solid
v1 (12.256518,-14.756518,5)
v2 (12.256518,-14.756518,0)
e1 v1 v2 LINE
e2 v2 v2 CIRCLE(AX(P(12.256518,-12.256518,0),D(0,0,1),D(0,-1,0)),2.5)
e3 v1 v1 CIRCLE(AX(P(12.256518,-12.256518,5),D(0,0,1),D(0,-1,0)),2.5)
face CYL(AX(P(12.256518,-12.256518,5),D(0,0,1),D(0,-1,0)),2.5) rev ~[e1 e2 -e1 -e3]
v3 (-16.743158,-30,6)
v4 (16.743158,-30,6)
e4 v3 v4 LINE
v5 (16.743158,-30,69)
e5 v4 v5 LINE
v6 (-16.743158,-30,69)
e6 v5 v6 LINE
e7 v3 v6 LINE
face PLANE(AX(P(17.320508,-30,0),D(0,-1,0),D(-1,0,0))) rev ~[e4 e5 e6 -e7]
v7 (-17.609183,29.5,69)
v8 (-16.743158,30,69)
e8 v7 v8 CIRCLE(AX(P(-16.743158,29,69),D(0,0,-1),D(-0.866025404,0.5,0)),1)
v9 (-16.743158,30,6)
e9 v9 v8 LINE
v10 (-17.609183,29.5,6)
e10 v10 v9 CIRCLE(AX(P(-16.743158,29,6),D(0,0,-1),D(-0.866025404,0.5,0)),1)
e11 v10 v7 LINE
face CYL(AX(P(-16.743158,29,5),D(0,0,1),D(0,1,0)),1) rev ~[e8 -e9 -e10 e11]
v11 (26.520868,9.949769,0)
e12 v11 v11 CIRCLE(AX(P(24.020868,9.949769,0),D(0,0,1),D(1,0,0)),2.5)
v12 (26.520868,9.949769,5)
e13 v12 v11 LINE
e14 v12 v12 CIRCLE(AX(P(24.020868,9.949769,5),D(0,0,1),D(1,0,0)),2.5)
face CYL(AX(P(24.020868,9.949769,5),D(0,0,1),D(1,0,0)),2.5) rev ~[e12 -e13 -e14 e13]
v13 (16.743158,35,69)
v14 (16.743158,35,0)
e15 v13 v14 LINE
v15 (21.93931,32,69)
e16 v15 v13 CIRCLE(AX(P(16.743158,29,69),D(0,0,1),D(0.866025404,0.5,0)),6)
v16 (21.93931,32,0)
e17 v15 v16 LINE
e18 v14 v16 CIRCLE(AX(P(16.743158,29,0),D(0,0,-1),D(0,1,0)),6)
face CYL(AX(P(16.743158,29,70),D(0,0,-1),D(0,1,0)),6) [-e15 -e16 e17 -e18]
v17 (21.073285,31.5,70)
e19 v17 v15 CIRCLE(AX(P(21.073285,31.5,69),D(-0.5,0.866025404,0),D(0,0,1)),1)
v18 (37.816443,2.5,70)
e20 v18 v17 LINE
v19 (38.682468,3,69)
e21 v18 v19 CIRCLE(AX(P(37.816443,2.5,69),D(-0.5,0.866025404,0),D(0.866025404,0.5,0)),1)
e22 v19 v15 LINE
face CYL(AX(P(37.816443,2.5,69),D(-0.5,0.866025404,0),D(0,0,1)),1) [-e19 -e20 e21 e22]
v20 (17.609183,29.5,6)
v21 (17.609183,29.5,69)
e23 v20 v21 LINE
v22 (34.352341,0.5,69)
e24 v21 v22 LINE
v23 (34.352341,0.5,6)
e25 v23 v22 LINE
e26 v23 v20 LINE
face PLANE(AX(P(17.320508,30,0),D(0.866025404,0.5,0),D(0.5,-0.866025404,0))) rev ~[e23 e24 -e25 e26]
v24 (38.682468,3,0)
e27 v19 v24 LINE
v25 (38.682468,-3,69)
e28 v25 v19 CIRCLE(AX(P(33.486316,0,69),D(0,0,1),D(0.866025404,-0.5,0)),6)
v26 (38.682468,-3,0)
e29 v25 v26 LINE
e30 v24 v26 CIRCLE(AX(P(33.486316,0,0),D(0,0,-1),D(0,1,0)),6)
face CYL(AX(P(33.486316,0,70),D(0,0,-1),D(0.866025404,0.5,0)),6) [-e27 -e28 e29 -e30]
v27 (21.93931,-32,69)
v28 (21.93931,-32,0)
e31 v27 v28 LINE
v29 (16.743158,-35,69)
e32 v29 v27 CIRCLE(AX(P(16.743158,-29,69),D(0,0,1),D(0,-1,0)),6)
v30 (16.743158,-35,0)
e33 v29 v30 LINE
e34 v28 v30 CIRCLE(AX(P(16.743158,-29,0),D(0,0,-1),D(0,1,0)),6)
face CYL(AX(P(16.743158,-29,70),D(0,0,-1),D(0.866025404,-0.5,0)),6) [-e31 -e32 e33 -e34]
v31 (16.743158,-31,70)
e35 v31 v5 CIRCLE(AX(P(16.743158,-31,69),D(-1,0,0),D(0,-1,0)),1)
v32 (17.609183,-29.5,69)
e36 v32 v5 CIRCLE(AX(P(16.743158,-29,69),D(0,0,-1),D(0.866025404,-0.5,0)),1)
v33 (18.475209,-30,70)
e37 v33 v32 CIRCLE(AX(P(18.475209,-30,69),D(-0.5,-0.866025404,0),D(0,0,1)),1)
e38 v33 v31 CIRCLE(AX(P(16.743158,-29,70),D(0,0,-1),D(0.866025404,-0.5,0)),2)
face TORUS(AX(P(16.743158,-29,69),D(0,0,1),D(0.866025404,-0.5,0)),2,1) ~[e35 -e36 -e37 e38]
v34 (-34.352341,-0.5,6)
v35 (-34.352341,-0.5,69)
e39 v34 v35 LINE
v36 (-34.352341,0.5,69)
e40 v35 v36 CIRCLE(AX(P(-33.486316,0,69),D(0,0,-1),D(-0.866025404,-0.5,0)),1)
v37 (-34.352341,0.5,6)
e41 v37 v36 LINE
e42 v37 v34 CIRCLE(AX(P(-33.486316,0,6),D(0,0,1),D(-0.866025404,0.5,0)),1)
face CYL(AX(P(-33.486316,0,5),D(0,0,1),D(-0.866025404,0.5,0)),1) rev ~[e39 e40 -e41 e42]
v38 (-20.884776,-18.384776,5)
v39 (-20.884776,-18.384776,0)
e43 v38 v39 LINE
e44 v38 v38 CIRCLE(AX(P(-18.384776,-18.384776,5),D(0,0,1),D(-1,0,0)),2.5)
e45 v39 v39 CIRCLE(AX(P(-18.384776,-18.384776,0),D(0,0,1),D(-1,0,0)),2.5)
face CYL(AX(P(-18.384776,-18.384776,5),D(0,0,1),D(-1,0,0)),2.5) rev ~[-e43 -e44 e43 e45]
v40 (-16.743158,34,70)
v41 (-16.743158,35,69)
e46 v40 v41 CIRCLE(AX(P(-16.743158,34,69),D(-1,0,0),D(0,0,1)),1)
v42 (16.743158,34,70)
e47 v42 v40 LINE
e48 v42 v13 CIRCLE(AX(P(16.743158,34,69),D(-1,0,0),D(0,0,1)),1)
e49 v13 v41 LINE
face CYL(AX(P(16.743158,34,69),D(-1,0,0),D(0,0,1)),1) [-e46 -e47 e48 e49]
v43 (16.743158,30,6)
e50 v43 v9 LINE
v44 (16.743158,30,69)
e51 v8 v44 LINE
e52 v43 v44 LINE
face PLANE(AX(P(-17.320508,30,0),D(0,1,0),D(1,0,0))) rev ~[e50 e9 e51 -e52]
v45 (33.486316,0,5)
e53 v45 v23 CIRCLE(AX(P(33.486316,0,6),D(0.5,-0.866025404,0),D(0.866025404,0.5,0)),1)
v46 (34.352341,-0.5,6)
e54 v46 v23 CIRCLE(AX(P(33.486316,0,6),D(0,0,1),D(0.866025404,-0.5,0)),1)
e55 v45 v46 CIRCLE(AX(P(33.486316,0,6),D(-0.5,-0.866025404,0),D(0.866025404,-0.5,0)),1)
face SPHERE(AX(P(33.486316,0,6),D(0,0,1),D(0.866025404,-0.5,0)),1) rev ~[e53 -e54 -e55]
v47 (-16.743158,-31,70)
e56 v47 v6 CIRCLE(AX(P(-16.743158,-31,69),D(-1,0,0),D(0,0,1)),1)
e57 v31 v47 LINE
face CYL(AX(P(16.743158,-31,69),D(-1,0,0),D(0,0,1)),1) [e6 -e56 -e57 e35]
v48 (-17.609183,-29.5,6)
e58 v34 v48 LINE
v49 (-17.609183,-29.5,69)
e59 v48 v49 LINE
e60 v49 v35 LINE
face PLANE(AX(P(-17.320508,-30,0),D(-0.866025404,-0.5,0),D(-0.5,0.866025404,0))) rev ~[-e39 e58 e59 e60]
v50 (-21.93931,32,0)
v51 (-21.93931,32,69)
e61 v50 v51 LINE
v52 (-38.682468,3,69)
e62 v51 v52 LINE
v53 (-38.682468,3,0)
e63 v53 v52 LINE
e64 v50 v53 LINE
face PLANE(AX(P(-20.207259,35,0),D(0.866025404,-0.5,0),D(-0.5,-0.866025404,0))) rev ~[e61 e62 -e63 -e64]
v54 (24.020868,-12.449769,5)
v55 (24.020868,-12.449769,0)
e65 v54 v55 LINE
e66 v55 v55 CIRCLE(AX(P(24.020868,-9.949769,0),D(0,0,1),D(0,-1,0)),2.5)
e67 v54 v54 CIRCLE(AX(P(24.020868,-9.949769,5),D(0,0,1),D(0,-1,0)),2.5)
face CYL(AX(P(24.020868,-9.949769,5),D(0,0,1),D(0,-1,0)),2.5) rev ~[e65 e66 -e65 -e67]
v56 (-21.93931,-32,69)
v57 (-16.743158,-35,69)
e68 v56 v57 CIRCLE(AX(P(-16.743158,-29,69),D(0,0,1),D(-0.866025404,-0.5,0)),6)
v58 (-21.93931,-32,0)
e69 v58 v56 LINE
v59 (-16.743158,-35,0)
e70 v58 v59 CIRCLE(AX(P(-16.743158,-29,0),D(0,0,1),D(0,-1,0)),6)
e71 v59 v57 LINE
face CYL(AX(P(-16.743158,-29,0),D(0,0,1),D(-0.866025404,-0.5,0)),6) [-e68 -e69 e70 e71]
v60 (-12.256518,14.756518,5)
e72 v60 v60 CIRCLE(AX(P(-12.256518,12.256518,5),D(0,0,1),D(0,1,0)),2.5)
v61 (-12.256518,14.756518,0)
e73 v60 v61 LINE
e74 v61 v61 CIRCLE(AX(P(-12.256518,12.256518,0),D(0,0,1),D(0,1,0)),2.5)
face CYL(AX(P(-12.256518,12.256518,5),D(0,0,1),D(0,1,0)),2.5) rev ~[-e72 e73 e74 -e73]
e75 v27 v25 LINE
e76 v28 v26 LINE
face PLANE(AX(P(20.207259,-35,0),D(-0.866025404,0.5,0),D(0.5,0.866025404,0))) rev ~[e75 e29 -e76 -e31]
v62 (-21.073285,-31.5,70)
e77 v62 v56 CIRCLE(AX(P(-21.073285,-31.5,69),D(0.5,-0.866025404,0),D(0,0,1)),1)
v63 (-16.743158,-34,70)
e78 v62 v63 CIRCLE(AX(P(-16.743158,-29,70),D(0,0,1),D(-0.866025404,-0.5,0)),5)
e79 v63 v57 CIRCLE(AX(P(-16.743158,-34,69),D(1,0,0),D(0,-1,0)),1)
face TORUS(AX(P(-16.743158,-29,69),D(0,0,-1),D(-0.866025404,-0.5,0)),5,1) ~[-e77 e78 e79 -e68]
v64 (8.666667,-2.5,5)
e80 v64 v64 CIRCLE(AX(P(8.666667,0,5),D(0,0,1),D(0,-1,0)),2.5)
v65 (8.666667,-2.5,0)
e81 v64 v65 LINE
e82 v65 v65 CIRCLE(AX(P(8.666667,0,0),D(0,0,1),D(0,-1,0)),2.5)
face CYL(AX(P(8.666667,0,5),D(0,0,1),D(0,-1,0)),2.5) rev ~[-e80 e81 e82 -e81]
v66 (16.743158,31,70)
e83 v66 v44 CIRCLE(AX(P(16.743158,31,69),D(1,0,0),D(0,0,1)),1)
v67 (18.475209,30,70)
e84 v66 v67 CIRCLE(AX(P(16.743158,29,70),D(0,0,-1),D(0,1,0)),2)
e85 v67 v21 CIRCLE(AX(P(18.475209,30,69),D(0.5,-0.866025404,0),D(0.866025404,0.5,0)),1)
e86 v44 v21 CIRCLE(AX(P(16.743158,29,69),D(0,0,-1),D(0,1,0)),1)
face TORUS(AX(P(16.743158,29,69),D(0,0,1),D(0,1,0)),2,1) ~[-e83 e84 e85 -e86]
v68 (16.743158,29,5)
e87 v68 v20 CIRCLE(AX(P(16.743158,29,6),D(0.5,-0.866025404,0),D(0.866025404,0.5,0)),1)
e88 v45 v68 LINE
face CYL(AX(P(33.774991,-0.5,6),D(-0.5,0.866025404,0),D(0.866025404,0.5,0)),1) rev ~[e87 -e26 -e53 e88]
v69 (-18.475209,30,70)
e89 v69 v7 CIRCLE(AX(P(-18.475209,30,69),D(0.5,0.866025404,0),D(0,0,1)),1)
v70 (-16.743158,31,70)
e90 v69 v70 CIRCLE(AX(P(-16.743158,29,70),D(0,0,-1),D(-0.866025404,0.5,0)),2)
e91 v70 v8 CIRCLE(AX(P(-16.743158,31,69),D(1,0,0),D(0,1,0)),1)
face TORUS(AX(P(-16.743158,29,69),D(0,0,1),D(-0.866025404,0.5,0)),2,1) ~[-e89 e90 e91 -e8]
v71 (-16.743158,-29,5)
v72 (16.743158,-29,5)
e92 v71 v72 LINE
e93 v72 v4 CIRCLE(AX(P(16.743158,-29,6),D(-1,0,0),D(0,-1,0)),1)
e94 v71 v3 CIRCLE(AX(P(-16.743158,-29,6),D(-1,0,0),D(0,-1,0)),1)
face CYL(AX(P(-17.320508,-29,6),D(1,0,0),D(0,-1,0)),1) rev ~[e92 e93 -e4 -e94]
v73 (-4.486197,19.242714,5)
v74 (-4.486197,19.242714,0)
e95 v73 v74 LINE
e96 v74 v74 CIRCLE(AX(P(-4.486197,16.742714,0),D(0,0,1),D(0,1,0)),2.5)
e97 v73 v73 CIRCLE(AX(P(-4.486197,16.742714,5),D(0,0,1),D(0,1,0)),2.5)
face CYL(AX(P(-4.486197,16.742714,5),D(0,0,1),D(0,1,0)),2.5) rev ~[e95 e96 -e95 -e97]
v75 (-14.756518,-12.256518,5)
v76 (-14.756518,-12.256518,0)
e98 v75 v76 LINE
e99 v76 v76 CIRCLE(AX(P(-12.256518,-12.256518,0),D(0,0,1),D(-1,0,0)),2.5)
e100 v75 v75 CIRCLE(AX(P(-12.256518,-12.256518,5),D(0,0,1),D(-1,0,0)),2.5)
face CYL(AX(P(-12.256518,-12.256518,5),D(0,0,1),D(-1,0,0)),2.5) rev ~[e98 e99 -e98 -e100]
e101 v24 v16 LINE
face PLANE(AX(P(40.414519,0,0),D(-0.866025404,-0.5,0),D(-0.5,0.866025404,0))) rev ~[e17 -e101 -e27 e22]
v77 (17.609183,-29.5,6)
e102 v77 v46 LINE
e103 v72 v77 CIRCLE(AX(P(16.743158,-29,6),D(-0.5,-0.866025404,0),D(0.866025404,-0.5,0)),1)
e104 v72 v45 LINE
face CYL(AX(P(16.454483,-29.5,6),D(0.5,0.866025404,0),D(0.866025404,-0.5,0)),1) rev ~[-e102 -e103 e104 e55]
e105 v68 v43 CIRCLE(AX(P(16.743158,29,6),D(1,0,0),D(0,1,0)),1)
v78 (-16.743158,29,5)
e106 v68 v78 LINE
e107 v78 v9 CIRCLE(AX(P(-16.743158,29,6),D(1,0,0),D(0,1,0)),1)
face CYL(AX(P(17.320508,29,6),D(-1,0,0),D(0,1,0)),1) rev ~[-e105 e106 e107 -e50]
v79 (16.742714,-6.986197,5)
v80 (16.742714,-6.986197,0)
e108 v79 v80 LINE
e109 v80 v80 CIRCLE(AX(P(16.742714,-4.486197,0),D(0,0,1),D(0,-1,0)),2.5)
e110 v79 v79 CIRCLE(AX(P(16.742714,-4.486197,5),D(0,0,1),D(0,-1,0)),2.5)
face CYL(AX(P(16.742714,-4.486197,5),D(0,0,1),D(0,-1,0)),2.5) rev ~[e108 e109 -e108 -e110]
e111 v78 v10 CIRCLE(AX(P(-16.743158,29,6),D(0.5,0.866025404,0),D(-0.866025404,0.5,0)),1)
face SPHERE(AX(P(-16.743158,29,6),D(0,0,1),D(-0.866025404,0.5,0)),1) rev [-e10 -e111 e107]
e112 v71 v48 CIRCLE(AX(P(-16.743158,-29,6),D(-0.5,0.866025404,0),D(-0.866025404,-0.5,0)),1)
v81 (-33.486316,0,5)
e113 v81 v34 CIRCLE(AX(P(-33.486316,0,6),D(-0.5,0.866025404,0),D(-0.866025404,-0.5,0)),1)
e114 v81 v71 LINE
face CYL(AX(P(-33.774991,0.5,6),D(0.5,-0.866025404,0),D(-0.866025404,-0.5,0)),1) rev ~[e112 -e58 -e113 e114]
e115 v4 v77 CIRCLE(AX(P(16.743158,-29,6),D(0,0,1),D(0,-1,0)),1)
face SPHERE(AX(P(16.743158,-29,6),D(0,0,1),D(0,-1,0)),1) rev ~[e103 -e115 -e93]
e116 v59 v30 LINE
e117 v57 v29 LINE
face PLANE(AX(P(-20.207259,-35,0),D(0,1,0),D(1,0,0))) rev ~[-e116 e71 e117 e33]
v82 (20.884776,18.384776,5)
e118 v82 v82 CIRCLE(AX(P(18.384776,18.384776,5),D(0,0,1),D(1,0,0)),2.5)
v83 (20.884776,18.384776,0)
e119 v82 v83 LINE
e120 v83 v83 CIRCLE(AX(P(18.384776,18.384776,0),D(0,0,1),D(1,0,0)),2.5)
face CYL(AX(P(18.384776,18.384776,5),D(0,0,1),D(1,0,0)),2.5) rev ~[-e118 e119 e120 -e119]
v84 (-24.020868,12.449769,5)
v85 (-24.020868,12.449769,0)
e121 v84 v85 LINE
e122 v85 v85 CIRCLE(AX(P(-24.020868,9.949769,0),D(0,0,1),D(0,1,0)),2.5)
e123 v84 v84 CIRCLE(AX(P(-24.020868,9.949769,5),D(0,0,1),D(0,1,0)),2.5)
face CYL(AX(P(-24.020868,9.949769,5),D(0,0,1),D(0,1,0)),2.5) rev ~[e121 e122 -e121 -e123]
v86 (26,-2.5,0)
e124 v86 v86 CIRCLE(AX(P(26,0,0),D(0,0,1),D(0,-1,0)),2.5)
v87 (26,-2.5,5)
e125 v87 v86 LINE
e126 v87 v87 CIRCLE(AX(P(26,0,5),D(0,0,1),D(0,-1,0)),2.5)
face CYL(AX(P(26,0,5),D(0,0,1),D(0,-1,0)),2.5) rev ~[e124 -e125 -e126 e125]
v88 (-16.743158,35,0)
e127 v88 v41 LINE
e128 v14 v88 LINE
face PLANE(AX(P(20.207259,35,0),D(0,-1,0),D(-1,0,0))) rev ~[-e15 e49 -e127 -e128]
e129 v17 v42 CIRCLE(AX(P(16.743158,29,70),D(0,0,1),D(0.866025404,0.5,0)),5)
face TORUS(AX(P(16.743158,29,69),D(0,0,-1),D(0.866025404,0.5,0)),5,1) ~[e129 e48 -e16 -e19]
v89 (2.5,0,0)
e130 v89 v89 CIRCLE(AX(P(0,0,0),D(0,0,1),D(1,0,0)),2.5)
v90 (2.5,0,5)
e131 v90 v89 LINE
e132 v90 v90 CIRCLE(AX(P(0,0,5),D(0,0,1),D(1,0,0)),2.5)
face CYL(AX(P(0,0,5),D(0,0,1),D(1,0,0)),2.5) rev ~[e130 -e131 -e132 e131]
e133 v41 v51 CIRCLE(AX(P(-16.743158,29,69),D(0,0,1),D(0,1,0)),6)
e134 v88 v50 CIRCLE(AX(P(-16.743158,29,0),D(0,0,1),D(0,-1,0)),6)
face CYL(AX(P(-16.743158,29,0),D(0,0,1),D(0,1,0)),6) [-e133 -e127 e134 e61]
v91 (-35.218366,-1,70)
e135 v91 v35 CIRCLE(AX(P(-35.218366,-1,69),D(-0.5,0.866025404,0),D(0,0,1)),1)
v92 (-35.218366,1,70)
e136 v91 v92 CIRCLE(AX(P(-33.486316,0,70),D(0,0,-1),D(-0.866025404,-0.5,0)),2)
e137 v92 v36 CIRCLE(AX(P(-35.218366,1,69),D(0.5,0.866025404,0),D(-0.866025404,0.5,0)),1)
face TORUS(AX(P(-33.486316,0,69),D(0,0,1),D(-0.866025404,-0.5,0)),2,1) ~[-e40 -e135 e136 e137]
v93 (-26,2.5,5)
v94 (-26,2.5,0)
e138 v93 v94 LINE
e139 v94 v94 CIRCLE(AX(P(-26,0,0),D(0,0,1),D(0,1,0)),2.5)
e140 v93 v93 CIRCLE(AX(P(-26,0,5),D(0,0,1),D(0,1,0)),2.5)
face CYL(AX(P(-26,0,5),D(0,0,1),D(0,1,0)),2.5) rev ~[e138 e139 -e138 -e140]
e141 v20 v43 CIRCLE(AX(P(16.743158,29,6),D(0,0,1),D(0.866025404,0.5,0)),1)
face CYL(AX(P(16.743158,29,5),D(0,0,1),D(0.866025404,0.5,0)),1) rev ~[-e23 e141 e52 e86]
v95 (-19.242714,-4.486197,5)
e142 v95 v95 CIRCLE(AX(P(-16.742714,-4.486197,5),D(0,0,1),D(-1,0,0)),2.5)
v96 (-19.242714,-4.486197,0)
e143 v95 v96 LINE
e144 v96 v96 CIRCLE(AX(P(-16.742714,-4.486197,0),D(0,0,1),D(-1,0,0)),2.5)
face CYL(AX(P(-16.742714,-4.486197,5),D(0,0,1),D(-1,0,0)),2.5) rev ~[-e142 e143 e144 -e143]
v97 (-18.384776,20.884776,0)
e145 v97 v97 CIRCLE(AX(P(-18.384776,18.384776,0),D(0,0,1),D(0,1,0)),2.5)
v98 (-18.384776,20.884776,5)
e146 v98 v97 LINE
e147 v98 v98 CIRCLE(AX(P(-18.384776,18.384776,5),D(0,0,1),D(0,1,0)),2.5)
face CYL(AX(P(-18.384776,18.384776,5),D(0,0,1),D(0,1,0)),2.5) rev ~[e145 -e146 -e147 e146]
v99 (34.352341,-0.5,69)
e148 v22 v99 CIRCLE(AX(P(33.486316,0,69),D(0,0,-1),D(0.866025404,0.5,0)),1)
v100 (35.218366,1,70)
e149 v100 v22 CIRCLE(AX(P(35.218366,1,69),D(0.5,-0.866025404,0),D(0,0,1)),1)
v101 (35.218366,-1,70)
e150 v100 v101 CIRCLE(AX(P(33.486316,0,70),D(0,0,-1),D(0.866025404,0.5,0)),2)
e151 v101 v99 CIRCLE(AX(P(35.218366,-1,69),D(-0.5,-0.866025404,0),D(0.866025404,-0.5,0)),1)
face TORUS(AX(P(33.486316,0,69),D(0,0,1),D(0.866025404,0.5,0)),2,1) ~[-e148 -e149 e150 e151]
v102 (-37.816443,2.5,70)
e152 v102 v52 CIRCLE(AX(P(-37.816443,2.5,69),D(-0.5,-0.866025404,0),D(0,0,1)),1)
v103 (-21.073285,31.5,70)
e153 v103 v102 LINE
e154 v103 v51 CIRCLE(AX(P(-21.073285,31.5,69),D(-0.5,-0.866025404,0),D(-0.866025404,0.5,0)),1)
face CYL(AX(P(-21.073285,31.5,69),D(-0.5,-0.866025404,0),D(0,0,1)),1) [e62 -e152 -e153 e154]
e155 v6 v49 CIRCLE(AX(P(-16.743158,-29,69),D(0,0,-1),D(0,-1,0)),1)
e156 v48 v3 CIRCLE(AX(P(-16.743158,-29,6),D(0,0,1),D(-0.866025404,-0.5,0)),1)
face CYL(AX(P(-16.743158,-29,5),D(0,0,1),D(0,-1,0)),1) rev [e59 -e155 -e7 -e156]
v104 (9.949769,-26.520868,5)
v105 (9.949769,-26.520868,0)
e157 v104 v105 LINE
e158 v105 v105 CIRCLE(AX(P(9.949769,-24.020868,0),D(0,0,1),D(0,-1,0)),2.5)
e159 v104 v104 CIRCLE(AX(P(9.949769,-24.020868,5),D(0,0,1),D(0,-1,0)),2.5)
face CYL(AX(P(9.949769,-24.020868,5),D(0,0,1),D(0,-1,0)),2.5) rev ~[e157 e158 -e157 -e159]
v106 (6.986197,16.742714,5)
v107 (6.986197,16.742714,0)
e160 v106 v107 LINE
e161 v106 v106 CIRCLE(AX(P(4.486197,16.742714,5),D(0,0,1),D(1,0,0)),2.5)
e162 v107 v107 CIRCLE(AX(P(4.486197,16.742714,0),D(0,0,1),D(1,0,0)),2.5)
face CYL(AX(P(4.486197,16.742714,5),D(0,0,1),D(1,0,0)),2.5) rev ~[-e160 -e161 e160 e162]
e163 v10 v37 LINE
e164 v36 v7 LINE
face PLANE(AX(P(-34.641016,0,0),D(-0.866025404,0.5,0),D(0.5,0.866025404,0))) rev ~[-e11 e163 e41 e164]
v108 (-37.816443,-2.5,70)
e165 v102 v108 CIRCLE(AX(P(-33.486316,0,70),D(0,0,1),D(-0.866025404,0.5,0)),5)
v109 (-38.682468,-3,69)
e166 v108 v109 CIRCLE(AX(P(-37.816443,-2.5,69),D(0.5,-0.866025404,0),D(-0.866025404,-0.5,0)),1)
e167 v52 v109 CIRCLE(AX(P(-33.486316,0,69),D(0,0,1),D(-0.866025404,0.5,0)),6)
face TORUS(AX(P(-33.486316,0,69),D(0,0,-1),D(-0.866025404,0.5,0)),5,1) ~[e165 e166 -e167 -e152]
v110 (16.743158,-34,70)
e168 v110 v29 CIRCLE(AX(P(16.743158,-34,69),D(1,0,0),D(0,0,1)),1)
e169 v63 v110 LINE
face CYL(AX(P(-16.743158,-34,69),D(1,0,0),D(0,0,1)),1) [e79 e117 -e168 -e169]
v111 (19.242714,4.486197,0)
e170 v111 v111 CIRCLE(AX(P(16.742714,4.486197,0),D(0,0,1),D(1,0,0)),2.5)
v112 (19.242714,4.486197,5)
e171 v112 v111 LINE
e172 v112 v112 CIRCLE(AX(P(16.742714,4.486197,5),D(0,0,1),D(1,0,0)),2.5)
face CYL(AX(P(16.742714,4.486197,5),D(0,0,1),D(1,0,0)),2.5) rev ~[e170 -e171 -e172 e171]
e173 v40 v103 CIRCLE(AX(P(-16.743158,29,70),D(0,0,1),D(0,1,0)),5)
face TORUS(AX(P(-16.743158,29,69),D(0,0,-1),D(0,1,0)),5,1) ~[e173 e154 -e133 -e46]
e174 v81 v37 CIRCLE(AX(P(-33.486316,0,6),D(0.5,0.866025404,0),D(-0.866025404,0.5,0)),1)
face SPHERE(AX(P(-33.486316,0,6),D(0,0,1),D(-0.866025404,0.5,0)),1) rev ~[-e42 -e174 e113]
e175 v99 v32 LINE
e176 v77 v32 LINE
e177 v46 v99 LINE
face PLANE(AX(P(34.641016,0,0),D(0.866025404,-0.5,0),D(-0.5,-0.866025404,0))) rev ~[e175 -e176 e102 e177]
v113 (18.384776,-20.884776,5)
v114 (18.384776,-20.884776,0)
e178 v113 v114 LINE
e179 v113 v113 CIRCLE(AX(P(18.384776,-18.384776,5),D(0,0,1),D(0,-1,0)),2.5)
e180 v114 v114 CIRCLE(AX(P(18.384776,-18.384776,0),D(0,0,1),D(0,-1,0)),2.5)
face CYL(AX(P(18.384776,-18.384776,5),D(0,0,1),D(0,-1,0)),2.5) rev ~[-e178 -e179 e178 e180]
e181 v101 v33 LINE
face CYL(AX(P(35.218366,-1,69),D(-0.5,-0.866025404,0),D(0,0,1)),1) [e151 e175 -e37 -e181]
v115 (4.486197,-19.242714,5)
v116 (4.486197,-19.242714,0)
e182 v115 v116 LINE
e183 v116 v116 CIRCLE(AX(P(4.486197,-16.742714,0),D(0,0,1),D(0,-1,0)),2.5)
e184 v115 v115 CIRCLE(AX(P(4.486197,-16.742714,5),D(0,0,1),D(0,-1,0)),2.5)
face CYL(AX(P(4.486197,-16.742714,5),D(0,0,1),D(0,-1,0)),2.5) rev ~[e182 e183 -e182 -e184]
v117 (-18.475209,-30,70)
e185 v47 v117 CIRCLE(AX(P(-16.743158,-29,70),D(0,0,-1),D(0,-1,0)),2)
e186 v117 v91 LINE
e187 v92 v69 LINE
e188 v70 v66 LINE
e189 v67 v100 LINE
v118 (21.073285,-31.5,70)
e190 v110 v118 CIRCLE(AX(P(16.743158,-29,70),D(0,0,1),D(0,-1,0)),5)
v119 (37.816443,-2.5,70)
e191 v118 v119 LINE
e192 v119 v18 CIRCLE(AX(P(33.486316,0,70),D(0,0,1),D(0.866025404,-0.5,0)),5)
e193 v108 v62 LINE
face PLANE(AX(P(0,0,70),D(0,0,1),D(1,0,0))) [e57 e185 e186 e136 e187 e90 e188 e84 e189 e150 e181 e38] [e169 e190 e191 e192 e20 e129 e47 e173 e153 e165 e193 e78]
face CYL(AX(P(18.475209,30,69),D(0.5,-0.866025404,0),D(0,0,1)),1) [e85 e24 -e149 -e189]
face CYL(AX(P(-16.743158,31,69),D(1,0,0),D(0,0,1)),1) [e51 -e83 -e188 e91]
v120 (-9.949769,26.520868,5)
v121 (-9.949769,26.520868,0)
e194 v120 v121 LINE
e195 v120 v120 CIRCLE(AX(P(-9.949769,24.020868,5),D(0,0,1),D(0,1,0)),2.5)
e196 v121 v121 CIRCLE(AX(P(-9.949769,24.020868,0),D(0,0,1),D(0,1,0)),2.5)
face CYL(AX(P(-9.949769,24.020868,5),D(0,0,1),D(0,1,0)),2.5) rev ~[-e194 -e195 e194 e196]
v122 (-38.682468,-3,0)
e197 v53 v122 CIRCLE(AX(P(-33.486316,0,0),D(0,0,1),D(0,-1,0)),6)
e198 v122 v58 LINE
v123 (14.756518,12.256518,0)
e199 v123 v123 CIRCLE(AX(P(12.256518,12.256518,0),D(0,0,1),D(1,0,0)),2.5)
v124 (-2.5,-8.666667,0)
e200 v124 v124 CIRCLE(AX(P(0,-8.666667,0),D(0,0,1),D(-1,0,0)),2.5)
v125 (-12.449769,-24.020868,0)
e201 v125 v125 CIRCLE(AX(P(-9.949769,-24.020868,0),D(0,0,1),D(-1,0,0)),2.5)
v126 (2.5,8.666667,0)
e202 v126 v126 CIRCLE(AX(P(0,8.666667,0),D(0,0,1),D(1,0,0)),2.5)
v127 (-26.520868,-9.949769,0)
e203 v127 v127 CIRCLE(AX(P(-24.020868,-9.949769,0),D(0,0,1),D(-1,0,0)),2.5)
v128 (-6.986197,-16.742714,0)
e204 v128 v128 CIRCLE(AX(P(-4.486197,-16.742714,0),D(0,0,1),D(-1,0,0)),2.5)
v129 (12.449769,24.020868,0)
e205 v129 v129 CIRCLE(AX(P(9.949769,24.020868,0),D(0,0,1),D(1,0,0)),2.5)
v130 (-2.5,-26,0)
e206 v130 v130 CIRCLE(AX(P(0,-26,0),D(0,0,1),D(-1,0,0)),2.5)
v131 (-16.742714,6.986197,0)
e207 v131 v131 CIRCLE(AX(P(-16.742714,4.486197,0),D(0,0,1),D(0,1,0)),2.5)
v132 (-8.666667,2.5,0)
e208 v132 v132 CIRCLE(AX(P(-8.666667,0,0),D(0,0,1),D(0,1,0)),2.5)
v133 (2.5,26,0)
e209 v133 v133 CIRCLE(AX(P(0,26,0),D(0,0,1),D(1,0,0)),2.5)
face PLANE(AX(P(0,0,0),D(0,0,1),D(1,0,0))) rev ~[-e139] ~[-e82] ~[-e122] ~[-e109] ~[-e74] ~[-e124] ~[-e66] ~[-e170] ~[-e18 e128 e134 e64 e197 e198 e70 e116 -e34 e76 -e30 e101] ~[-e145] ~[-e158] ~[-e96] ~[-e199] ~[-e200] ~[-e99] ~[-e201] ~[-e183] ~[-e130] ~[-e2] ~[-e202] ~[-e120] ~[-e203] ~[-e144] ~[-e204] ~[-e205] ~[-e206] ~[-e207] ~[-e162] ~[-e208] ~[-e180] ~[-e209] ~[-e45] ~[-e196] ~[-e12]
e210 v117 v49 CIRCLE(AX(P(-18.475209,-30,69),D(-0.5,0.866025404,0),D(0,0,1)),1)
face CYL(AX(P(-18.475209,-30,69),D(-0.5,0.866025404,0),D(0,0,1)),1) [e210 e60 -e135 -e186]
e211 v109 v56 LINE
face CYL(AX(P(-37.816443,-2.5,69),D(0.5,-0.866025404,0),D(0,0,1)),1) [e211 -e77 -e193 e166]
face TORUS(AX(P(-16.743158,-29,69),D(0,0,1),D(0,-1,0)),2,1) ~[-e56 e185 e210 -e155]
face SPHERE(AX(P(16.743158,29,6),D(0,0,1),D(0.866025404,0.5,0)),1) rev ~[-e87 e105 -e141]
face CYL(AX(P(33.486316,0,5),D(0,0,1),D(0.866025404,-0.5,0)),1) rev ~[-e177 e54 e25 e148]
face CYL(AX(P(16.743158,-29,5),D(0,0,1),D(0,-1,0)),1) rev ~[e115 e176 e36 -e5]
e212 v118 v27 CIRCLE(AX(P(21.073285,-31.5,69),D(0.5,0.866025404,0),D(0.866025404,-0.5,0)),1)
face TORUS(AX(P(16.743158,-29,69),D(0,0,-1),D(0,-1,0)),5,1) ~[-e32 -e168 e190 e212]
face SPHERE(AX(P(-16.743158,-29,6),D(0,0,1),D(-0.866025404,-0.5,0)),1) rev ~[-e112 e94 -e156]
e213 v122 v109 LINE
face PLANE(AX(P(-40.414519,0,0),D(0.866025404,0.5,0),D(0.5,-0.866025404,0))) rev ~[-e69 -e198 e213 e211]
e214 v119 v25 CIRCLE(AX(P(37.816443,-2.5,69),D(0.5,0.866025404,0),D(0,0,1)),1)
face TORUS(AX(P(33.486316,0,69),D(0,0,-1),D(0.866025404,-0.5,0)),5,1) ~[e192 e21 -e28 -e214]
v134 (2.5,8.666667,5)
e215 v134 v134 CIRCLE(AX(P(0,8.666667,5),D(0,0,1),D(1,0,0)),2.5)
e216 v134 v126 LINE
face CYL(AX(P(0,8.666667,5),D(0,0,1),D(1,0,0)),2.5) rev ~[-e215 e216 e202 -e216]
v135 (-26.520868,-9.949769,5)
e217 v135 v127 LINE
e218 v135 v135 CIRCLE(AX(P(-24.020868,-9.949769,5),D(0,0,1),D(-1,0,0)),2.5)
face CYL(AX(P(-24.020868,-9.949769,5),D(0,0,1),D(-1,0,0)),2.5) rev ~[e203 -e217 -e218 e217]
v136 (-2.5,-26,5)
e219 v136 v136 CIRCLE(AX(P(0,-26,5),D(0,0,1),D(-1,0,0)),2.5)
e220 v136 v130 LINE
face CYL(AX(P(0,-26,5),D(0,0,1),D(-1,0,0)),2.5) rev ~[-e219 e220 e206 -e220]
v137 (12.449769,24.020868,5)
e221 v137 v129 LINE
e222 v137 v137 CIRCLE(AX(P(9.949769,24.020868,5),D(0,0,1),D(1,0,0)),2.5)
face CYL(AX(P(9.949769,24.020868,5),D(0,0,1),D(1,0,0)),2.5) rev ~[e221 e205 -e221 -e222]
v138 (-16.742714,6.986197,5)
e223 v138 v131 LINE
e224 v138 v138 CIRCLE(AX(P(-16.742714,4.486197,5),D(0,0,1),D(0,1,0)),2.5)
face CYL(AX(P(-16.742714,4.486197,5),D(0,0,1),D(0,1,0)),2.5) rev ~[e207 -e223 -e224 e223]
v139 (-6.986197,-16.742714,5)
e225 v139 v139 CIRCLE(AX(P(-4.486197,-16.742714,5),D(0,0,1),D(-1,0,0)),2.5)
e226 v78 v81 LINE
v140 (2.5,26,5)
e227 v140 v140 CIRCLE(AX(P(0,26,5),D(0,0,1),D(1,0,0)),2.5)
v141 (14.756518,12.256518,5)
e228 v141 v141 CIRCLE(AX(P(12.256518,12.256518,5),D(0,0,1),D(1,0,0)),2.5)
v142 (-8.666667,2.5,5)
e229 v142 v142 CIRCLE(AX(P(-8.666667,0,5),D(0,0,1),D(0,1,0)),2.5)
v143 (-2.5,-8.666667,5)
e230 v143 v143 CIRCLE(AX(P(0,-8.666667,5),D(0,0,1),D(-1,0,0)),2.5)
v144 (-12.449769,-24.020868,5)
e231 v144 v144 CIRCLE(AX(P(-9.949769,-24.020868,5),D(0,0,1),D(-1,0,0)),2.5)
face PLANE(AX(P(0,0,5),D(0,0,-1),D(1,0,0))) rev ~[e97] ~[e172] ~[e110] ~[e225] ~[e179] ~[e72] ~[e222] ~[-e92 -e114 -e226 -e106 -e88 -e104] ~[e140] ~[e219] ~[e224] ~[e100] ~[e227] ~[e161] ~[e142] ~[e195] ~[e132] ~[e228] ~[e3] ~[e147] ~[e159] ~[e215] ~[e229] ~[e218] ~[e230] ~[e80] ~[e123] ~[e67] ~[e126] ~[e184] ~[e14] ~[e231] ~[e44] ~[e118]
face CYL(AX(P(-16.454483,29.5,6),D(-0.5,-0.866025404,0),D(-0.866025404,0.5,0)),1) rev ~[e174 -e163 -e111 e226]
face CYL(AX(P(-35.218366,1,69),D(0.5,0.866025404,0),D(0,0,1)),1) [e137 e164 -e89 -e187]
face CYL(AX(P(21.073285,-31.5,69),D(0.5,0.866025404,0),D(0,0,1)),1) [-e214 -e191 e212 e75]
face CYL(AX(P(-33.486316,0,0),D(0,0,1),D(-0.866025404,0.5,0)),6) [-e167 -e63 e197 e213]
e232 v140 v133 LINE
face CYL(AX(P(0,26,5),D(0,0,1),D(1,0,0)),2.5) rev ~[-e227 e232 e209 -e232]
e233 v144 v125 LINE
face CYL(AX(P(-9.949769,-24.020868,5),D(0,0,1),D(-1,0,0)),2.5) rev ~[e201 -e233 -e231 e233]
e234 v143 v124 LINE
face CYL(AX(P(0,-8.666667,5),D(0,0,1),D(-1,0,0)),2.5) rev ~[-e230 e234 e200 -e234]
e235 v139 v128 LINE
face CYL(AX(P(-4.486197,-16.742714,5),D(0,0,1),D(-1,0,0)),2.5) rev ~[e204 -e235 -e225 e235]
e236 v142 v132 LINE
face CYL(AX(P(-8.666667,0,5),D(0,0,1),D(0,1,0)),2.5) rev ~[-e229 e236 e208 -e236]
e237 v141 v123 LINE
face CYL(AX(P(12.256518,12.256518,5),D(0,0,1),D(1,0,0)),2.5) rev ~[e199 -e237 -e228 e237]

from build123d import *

# Parameters (mm, degrees)
F1_DEPTH        = 70
F3_DEPTH        = 5
F4_R            = 2.5
F5_DEPTH        = 5
F5_COPIES_COUNT = 4
F7_R            = 2.5
F8_DEPTH        = 5
F9_R            = 6
F10_R           = 1
F11_R           = 1


# Not quite as in the source:
# - a pattern or mirror of a feature is missing from the dataset's text; its kind, count and spacing are read off the source's solid


with BuildPart() as f1:
    # F0 (on Top) → F1 (new body)
    with BuildSketch(Plane.XY):
        Polygon((20.2072594216, 35), (-20.2072594216, 35), (-40.4145188433, 0), (-20.2072594216, -35), (20.2072594216, -35), (40.4145188433, 0), align=None)
        Polygon((-17.3205080757, -30), (-34.6410161514, 0), (-17.3205080757, 30), (17.3205080757, 30), (34.6410161514, 0), (17.3205080757, -30), align=None, mode=Mode.SUBTRACT)
    extrude(amount=F1_DEPTH)

    # F2 (on face) → F3 (join)
    with BuildSketch(Plane(origin=(0, 0, 0), x_dir=(1, 0, 0), z_dir=(0, 0, -1))):
        Polygon((-20.2072594216, 35), (-40.4145188433, 0), (-20.2072594216, -35), (20.2072594216, -35), (40.4145188433, 0), (20.2072594216, 35), align=None)
    extrude(amount=-F3_DEPTH)

    # F4 (on face) → F5 (cut, through all)
    with BuildSketch(Plane.XY.offset(5)):
        with Locations((0, 26)):
            Circle(F4_R)
        with Locations((4.4861967818, 16.7427143223)):
            Circle(F4_R)
        with Locations((0, 8.6666666667)):
            Circle(F4_R)
        with Locations((12.2565175406, 12.2565175406)):
            Circle(F4_R)
        with Locations((9.9497692415, 24.0208678453)):
            Circle(F4_R)
        with Locations((24.0208678453, 9.9497692415)):
            Circle(F4_R)
        with Locations((16.7427143223, 4.4861967818)):
            Circle(F4_R)
        with Locations((18.3847763109, 18.3847763109)):
            Circle(F4_R)
    f5 = extrude(amount=-F5_DEPTH, mode=Mode.SUBTRACT)

    # F5_copies: F5 ×4 about axis
    f5_copies_axis = Axis((0, 0, 0), (0, 0, 1))
    for i in range(1, F5_COPIES_COUNT):
        add(f5.rotate(f5_copies_axis, i * 360 / F5_COPIES_COUNT), mode=Mode.SUBTRACT)

    # F7 (on face) → F8 (cut, through all)
    with BuildSketch(Plane.XY.offset(5)):
        Circle(F7_R)
    extrude(amount=-F8_DEPTH, mode=Mode.SUBTRACT)

    # F9
    f9_edges = [f1.edges().sort_by_distance(p)[0] for p in [
        (-20.207259, 35, 35),
        (-40.414519, 0, 35),
        (-20.207259, -35, 35),
        (20.207259, -35, 35),
        (40.414519, 0, 35),
        (20.207259, 35, 35),
    ]]
    fillet(f9_edges, radius=F9_R)

    # F10
    f10_edges = [f1.edges().sort_by_distance(p)[0] for p in [
        (-17.320508, 30, 37.5),
        (17.320508, 30, 37.5),
        (34.641016, 0, 37.5),
        (17.320508, -30, 37.5),
        (-17.320508, -30, 37.5),
        (-34.641016, 0, 37.5),
        (-25.980762, 15, 5),
        (-25.980762, -15, 5),
        (0, -30, 5),
        (25.980762, -15, 5),
        (25.980762, 15, 5),
        (0, 30, 5),
    ]]
    fillet(f10_edges, radius=F10_R)

    # F11
    f11_edges = [f1.edges().sort_by_distance(p)[0] for p in [
        (-25.980762, -15, 70),
        (-17.243158, -29.866025, 70),
        (-34.486316, 0, 70),
        (0, -30, 70),
        (-25.980762, 15, 70),
        (17.243158, -29.866025, 70),
        (-17.243158, 29.866025, 70),
        (25.980762, -15, 70),
        (0, 30, 70),
        (34.486316, 0, 70),
        (17.243158, 29.866025, 70),
        (25.980762, 15, 70),
        (0, 35, 70),
        (19.743158, 34.196152, 70),
        (-19.743158, 34.196152, 70),
        (30.310889, 17.5, 70),
        (-30.310889, 17.5, 70),
        (39.486316, 0, 70),
        (-39.486316, 0, 70),
        (30.310889, -17.5, 70),
        (-30.310889, -17.5, 70),
        (19.743158, -34.196152, 70),
        (-19.743158, -34.196152, 70),
        (0, -35, 70),
    ]]
    fillet(f11_edges, radius=F11_R)


solid = f1.part
